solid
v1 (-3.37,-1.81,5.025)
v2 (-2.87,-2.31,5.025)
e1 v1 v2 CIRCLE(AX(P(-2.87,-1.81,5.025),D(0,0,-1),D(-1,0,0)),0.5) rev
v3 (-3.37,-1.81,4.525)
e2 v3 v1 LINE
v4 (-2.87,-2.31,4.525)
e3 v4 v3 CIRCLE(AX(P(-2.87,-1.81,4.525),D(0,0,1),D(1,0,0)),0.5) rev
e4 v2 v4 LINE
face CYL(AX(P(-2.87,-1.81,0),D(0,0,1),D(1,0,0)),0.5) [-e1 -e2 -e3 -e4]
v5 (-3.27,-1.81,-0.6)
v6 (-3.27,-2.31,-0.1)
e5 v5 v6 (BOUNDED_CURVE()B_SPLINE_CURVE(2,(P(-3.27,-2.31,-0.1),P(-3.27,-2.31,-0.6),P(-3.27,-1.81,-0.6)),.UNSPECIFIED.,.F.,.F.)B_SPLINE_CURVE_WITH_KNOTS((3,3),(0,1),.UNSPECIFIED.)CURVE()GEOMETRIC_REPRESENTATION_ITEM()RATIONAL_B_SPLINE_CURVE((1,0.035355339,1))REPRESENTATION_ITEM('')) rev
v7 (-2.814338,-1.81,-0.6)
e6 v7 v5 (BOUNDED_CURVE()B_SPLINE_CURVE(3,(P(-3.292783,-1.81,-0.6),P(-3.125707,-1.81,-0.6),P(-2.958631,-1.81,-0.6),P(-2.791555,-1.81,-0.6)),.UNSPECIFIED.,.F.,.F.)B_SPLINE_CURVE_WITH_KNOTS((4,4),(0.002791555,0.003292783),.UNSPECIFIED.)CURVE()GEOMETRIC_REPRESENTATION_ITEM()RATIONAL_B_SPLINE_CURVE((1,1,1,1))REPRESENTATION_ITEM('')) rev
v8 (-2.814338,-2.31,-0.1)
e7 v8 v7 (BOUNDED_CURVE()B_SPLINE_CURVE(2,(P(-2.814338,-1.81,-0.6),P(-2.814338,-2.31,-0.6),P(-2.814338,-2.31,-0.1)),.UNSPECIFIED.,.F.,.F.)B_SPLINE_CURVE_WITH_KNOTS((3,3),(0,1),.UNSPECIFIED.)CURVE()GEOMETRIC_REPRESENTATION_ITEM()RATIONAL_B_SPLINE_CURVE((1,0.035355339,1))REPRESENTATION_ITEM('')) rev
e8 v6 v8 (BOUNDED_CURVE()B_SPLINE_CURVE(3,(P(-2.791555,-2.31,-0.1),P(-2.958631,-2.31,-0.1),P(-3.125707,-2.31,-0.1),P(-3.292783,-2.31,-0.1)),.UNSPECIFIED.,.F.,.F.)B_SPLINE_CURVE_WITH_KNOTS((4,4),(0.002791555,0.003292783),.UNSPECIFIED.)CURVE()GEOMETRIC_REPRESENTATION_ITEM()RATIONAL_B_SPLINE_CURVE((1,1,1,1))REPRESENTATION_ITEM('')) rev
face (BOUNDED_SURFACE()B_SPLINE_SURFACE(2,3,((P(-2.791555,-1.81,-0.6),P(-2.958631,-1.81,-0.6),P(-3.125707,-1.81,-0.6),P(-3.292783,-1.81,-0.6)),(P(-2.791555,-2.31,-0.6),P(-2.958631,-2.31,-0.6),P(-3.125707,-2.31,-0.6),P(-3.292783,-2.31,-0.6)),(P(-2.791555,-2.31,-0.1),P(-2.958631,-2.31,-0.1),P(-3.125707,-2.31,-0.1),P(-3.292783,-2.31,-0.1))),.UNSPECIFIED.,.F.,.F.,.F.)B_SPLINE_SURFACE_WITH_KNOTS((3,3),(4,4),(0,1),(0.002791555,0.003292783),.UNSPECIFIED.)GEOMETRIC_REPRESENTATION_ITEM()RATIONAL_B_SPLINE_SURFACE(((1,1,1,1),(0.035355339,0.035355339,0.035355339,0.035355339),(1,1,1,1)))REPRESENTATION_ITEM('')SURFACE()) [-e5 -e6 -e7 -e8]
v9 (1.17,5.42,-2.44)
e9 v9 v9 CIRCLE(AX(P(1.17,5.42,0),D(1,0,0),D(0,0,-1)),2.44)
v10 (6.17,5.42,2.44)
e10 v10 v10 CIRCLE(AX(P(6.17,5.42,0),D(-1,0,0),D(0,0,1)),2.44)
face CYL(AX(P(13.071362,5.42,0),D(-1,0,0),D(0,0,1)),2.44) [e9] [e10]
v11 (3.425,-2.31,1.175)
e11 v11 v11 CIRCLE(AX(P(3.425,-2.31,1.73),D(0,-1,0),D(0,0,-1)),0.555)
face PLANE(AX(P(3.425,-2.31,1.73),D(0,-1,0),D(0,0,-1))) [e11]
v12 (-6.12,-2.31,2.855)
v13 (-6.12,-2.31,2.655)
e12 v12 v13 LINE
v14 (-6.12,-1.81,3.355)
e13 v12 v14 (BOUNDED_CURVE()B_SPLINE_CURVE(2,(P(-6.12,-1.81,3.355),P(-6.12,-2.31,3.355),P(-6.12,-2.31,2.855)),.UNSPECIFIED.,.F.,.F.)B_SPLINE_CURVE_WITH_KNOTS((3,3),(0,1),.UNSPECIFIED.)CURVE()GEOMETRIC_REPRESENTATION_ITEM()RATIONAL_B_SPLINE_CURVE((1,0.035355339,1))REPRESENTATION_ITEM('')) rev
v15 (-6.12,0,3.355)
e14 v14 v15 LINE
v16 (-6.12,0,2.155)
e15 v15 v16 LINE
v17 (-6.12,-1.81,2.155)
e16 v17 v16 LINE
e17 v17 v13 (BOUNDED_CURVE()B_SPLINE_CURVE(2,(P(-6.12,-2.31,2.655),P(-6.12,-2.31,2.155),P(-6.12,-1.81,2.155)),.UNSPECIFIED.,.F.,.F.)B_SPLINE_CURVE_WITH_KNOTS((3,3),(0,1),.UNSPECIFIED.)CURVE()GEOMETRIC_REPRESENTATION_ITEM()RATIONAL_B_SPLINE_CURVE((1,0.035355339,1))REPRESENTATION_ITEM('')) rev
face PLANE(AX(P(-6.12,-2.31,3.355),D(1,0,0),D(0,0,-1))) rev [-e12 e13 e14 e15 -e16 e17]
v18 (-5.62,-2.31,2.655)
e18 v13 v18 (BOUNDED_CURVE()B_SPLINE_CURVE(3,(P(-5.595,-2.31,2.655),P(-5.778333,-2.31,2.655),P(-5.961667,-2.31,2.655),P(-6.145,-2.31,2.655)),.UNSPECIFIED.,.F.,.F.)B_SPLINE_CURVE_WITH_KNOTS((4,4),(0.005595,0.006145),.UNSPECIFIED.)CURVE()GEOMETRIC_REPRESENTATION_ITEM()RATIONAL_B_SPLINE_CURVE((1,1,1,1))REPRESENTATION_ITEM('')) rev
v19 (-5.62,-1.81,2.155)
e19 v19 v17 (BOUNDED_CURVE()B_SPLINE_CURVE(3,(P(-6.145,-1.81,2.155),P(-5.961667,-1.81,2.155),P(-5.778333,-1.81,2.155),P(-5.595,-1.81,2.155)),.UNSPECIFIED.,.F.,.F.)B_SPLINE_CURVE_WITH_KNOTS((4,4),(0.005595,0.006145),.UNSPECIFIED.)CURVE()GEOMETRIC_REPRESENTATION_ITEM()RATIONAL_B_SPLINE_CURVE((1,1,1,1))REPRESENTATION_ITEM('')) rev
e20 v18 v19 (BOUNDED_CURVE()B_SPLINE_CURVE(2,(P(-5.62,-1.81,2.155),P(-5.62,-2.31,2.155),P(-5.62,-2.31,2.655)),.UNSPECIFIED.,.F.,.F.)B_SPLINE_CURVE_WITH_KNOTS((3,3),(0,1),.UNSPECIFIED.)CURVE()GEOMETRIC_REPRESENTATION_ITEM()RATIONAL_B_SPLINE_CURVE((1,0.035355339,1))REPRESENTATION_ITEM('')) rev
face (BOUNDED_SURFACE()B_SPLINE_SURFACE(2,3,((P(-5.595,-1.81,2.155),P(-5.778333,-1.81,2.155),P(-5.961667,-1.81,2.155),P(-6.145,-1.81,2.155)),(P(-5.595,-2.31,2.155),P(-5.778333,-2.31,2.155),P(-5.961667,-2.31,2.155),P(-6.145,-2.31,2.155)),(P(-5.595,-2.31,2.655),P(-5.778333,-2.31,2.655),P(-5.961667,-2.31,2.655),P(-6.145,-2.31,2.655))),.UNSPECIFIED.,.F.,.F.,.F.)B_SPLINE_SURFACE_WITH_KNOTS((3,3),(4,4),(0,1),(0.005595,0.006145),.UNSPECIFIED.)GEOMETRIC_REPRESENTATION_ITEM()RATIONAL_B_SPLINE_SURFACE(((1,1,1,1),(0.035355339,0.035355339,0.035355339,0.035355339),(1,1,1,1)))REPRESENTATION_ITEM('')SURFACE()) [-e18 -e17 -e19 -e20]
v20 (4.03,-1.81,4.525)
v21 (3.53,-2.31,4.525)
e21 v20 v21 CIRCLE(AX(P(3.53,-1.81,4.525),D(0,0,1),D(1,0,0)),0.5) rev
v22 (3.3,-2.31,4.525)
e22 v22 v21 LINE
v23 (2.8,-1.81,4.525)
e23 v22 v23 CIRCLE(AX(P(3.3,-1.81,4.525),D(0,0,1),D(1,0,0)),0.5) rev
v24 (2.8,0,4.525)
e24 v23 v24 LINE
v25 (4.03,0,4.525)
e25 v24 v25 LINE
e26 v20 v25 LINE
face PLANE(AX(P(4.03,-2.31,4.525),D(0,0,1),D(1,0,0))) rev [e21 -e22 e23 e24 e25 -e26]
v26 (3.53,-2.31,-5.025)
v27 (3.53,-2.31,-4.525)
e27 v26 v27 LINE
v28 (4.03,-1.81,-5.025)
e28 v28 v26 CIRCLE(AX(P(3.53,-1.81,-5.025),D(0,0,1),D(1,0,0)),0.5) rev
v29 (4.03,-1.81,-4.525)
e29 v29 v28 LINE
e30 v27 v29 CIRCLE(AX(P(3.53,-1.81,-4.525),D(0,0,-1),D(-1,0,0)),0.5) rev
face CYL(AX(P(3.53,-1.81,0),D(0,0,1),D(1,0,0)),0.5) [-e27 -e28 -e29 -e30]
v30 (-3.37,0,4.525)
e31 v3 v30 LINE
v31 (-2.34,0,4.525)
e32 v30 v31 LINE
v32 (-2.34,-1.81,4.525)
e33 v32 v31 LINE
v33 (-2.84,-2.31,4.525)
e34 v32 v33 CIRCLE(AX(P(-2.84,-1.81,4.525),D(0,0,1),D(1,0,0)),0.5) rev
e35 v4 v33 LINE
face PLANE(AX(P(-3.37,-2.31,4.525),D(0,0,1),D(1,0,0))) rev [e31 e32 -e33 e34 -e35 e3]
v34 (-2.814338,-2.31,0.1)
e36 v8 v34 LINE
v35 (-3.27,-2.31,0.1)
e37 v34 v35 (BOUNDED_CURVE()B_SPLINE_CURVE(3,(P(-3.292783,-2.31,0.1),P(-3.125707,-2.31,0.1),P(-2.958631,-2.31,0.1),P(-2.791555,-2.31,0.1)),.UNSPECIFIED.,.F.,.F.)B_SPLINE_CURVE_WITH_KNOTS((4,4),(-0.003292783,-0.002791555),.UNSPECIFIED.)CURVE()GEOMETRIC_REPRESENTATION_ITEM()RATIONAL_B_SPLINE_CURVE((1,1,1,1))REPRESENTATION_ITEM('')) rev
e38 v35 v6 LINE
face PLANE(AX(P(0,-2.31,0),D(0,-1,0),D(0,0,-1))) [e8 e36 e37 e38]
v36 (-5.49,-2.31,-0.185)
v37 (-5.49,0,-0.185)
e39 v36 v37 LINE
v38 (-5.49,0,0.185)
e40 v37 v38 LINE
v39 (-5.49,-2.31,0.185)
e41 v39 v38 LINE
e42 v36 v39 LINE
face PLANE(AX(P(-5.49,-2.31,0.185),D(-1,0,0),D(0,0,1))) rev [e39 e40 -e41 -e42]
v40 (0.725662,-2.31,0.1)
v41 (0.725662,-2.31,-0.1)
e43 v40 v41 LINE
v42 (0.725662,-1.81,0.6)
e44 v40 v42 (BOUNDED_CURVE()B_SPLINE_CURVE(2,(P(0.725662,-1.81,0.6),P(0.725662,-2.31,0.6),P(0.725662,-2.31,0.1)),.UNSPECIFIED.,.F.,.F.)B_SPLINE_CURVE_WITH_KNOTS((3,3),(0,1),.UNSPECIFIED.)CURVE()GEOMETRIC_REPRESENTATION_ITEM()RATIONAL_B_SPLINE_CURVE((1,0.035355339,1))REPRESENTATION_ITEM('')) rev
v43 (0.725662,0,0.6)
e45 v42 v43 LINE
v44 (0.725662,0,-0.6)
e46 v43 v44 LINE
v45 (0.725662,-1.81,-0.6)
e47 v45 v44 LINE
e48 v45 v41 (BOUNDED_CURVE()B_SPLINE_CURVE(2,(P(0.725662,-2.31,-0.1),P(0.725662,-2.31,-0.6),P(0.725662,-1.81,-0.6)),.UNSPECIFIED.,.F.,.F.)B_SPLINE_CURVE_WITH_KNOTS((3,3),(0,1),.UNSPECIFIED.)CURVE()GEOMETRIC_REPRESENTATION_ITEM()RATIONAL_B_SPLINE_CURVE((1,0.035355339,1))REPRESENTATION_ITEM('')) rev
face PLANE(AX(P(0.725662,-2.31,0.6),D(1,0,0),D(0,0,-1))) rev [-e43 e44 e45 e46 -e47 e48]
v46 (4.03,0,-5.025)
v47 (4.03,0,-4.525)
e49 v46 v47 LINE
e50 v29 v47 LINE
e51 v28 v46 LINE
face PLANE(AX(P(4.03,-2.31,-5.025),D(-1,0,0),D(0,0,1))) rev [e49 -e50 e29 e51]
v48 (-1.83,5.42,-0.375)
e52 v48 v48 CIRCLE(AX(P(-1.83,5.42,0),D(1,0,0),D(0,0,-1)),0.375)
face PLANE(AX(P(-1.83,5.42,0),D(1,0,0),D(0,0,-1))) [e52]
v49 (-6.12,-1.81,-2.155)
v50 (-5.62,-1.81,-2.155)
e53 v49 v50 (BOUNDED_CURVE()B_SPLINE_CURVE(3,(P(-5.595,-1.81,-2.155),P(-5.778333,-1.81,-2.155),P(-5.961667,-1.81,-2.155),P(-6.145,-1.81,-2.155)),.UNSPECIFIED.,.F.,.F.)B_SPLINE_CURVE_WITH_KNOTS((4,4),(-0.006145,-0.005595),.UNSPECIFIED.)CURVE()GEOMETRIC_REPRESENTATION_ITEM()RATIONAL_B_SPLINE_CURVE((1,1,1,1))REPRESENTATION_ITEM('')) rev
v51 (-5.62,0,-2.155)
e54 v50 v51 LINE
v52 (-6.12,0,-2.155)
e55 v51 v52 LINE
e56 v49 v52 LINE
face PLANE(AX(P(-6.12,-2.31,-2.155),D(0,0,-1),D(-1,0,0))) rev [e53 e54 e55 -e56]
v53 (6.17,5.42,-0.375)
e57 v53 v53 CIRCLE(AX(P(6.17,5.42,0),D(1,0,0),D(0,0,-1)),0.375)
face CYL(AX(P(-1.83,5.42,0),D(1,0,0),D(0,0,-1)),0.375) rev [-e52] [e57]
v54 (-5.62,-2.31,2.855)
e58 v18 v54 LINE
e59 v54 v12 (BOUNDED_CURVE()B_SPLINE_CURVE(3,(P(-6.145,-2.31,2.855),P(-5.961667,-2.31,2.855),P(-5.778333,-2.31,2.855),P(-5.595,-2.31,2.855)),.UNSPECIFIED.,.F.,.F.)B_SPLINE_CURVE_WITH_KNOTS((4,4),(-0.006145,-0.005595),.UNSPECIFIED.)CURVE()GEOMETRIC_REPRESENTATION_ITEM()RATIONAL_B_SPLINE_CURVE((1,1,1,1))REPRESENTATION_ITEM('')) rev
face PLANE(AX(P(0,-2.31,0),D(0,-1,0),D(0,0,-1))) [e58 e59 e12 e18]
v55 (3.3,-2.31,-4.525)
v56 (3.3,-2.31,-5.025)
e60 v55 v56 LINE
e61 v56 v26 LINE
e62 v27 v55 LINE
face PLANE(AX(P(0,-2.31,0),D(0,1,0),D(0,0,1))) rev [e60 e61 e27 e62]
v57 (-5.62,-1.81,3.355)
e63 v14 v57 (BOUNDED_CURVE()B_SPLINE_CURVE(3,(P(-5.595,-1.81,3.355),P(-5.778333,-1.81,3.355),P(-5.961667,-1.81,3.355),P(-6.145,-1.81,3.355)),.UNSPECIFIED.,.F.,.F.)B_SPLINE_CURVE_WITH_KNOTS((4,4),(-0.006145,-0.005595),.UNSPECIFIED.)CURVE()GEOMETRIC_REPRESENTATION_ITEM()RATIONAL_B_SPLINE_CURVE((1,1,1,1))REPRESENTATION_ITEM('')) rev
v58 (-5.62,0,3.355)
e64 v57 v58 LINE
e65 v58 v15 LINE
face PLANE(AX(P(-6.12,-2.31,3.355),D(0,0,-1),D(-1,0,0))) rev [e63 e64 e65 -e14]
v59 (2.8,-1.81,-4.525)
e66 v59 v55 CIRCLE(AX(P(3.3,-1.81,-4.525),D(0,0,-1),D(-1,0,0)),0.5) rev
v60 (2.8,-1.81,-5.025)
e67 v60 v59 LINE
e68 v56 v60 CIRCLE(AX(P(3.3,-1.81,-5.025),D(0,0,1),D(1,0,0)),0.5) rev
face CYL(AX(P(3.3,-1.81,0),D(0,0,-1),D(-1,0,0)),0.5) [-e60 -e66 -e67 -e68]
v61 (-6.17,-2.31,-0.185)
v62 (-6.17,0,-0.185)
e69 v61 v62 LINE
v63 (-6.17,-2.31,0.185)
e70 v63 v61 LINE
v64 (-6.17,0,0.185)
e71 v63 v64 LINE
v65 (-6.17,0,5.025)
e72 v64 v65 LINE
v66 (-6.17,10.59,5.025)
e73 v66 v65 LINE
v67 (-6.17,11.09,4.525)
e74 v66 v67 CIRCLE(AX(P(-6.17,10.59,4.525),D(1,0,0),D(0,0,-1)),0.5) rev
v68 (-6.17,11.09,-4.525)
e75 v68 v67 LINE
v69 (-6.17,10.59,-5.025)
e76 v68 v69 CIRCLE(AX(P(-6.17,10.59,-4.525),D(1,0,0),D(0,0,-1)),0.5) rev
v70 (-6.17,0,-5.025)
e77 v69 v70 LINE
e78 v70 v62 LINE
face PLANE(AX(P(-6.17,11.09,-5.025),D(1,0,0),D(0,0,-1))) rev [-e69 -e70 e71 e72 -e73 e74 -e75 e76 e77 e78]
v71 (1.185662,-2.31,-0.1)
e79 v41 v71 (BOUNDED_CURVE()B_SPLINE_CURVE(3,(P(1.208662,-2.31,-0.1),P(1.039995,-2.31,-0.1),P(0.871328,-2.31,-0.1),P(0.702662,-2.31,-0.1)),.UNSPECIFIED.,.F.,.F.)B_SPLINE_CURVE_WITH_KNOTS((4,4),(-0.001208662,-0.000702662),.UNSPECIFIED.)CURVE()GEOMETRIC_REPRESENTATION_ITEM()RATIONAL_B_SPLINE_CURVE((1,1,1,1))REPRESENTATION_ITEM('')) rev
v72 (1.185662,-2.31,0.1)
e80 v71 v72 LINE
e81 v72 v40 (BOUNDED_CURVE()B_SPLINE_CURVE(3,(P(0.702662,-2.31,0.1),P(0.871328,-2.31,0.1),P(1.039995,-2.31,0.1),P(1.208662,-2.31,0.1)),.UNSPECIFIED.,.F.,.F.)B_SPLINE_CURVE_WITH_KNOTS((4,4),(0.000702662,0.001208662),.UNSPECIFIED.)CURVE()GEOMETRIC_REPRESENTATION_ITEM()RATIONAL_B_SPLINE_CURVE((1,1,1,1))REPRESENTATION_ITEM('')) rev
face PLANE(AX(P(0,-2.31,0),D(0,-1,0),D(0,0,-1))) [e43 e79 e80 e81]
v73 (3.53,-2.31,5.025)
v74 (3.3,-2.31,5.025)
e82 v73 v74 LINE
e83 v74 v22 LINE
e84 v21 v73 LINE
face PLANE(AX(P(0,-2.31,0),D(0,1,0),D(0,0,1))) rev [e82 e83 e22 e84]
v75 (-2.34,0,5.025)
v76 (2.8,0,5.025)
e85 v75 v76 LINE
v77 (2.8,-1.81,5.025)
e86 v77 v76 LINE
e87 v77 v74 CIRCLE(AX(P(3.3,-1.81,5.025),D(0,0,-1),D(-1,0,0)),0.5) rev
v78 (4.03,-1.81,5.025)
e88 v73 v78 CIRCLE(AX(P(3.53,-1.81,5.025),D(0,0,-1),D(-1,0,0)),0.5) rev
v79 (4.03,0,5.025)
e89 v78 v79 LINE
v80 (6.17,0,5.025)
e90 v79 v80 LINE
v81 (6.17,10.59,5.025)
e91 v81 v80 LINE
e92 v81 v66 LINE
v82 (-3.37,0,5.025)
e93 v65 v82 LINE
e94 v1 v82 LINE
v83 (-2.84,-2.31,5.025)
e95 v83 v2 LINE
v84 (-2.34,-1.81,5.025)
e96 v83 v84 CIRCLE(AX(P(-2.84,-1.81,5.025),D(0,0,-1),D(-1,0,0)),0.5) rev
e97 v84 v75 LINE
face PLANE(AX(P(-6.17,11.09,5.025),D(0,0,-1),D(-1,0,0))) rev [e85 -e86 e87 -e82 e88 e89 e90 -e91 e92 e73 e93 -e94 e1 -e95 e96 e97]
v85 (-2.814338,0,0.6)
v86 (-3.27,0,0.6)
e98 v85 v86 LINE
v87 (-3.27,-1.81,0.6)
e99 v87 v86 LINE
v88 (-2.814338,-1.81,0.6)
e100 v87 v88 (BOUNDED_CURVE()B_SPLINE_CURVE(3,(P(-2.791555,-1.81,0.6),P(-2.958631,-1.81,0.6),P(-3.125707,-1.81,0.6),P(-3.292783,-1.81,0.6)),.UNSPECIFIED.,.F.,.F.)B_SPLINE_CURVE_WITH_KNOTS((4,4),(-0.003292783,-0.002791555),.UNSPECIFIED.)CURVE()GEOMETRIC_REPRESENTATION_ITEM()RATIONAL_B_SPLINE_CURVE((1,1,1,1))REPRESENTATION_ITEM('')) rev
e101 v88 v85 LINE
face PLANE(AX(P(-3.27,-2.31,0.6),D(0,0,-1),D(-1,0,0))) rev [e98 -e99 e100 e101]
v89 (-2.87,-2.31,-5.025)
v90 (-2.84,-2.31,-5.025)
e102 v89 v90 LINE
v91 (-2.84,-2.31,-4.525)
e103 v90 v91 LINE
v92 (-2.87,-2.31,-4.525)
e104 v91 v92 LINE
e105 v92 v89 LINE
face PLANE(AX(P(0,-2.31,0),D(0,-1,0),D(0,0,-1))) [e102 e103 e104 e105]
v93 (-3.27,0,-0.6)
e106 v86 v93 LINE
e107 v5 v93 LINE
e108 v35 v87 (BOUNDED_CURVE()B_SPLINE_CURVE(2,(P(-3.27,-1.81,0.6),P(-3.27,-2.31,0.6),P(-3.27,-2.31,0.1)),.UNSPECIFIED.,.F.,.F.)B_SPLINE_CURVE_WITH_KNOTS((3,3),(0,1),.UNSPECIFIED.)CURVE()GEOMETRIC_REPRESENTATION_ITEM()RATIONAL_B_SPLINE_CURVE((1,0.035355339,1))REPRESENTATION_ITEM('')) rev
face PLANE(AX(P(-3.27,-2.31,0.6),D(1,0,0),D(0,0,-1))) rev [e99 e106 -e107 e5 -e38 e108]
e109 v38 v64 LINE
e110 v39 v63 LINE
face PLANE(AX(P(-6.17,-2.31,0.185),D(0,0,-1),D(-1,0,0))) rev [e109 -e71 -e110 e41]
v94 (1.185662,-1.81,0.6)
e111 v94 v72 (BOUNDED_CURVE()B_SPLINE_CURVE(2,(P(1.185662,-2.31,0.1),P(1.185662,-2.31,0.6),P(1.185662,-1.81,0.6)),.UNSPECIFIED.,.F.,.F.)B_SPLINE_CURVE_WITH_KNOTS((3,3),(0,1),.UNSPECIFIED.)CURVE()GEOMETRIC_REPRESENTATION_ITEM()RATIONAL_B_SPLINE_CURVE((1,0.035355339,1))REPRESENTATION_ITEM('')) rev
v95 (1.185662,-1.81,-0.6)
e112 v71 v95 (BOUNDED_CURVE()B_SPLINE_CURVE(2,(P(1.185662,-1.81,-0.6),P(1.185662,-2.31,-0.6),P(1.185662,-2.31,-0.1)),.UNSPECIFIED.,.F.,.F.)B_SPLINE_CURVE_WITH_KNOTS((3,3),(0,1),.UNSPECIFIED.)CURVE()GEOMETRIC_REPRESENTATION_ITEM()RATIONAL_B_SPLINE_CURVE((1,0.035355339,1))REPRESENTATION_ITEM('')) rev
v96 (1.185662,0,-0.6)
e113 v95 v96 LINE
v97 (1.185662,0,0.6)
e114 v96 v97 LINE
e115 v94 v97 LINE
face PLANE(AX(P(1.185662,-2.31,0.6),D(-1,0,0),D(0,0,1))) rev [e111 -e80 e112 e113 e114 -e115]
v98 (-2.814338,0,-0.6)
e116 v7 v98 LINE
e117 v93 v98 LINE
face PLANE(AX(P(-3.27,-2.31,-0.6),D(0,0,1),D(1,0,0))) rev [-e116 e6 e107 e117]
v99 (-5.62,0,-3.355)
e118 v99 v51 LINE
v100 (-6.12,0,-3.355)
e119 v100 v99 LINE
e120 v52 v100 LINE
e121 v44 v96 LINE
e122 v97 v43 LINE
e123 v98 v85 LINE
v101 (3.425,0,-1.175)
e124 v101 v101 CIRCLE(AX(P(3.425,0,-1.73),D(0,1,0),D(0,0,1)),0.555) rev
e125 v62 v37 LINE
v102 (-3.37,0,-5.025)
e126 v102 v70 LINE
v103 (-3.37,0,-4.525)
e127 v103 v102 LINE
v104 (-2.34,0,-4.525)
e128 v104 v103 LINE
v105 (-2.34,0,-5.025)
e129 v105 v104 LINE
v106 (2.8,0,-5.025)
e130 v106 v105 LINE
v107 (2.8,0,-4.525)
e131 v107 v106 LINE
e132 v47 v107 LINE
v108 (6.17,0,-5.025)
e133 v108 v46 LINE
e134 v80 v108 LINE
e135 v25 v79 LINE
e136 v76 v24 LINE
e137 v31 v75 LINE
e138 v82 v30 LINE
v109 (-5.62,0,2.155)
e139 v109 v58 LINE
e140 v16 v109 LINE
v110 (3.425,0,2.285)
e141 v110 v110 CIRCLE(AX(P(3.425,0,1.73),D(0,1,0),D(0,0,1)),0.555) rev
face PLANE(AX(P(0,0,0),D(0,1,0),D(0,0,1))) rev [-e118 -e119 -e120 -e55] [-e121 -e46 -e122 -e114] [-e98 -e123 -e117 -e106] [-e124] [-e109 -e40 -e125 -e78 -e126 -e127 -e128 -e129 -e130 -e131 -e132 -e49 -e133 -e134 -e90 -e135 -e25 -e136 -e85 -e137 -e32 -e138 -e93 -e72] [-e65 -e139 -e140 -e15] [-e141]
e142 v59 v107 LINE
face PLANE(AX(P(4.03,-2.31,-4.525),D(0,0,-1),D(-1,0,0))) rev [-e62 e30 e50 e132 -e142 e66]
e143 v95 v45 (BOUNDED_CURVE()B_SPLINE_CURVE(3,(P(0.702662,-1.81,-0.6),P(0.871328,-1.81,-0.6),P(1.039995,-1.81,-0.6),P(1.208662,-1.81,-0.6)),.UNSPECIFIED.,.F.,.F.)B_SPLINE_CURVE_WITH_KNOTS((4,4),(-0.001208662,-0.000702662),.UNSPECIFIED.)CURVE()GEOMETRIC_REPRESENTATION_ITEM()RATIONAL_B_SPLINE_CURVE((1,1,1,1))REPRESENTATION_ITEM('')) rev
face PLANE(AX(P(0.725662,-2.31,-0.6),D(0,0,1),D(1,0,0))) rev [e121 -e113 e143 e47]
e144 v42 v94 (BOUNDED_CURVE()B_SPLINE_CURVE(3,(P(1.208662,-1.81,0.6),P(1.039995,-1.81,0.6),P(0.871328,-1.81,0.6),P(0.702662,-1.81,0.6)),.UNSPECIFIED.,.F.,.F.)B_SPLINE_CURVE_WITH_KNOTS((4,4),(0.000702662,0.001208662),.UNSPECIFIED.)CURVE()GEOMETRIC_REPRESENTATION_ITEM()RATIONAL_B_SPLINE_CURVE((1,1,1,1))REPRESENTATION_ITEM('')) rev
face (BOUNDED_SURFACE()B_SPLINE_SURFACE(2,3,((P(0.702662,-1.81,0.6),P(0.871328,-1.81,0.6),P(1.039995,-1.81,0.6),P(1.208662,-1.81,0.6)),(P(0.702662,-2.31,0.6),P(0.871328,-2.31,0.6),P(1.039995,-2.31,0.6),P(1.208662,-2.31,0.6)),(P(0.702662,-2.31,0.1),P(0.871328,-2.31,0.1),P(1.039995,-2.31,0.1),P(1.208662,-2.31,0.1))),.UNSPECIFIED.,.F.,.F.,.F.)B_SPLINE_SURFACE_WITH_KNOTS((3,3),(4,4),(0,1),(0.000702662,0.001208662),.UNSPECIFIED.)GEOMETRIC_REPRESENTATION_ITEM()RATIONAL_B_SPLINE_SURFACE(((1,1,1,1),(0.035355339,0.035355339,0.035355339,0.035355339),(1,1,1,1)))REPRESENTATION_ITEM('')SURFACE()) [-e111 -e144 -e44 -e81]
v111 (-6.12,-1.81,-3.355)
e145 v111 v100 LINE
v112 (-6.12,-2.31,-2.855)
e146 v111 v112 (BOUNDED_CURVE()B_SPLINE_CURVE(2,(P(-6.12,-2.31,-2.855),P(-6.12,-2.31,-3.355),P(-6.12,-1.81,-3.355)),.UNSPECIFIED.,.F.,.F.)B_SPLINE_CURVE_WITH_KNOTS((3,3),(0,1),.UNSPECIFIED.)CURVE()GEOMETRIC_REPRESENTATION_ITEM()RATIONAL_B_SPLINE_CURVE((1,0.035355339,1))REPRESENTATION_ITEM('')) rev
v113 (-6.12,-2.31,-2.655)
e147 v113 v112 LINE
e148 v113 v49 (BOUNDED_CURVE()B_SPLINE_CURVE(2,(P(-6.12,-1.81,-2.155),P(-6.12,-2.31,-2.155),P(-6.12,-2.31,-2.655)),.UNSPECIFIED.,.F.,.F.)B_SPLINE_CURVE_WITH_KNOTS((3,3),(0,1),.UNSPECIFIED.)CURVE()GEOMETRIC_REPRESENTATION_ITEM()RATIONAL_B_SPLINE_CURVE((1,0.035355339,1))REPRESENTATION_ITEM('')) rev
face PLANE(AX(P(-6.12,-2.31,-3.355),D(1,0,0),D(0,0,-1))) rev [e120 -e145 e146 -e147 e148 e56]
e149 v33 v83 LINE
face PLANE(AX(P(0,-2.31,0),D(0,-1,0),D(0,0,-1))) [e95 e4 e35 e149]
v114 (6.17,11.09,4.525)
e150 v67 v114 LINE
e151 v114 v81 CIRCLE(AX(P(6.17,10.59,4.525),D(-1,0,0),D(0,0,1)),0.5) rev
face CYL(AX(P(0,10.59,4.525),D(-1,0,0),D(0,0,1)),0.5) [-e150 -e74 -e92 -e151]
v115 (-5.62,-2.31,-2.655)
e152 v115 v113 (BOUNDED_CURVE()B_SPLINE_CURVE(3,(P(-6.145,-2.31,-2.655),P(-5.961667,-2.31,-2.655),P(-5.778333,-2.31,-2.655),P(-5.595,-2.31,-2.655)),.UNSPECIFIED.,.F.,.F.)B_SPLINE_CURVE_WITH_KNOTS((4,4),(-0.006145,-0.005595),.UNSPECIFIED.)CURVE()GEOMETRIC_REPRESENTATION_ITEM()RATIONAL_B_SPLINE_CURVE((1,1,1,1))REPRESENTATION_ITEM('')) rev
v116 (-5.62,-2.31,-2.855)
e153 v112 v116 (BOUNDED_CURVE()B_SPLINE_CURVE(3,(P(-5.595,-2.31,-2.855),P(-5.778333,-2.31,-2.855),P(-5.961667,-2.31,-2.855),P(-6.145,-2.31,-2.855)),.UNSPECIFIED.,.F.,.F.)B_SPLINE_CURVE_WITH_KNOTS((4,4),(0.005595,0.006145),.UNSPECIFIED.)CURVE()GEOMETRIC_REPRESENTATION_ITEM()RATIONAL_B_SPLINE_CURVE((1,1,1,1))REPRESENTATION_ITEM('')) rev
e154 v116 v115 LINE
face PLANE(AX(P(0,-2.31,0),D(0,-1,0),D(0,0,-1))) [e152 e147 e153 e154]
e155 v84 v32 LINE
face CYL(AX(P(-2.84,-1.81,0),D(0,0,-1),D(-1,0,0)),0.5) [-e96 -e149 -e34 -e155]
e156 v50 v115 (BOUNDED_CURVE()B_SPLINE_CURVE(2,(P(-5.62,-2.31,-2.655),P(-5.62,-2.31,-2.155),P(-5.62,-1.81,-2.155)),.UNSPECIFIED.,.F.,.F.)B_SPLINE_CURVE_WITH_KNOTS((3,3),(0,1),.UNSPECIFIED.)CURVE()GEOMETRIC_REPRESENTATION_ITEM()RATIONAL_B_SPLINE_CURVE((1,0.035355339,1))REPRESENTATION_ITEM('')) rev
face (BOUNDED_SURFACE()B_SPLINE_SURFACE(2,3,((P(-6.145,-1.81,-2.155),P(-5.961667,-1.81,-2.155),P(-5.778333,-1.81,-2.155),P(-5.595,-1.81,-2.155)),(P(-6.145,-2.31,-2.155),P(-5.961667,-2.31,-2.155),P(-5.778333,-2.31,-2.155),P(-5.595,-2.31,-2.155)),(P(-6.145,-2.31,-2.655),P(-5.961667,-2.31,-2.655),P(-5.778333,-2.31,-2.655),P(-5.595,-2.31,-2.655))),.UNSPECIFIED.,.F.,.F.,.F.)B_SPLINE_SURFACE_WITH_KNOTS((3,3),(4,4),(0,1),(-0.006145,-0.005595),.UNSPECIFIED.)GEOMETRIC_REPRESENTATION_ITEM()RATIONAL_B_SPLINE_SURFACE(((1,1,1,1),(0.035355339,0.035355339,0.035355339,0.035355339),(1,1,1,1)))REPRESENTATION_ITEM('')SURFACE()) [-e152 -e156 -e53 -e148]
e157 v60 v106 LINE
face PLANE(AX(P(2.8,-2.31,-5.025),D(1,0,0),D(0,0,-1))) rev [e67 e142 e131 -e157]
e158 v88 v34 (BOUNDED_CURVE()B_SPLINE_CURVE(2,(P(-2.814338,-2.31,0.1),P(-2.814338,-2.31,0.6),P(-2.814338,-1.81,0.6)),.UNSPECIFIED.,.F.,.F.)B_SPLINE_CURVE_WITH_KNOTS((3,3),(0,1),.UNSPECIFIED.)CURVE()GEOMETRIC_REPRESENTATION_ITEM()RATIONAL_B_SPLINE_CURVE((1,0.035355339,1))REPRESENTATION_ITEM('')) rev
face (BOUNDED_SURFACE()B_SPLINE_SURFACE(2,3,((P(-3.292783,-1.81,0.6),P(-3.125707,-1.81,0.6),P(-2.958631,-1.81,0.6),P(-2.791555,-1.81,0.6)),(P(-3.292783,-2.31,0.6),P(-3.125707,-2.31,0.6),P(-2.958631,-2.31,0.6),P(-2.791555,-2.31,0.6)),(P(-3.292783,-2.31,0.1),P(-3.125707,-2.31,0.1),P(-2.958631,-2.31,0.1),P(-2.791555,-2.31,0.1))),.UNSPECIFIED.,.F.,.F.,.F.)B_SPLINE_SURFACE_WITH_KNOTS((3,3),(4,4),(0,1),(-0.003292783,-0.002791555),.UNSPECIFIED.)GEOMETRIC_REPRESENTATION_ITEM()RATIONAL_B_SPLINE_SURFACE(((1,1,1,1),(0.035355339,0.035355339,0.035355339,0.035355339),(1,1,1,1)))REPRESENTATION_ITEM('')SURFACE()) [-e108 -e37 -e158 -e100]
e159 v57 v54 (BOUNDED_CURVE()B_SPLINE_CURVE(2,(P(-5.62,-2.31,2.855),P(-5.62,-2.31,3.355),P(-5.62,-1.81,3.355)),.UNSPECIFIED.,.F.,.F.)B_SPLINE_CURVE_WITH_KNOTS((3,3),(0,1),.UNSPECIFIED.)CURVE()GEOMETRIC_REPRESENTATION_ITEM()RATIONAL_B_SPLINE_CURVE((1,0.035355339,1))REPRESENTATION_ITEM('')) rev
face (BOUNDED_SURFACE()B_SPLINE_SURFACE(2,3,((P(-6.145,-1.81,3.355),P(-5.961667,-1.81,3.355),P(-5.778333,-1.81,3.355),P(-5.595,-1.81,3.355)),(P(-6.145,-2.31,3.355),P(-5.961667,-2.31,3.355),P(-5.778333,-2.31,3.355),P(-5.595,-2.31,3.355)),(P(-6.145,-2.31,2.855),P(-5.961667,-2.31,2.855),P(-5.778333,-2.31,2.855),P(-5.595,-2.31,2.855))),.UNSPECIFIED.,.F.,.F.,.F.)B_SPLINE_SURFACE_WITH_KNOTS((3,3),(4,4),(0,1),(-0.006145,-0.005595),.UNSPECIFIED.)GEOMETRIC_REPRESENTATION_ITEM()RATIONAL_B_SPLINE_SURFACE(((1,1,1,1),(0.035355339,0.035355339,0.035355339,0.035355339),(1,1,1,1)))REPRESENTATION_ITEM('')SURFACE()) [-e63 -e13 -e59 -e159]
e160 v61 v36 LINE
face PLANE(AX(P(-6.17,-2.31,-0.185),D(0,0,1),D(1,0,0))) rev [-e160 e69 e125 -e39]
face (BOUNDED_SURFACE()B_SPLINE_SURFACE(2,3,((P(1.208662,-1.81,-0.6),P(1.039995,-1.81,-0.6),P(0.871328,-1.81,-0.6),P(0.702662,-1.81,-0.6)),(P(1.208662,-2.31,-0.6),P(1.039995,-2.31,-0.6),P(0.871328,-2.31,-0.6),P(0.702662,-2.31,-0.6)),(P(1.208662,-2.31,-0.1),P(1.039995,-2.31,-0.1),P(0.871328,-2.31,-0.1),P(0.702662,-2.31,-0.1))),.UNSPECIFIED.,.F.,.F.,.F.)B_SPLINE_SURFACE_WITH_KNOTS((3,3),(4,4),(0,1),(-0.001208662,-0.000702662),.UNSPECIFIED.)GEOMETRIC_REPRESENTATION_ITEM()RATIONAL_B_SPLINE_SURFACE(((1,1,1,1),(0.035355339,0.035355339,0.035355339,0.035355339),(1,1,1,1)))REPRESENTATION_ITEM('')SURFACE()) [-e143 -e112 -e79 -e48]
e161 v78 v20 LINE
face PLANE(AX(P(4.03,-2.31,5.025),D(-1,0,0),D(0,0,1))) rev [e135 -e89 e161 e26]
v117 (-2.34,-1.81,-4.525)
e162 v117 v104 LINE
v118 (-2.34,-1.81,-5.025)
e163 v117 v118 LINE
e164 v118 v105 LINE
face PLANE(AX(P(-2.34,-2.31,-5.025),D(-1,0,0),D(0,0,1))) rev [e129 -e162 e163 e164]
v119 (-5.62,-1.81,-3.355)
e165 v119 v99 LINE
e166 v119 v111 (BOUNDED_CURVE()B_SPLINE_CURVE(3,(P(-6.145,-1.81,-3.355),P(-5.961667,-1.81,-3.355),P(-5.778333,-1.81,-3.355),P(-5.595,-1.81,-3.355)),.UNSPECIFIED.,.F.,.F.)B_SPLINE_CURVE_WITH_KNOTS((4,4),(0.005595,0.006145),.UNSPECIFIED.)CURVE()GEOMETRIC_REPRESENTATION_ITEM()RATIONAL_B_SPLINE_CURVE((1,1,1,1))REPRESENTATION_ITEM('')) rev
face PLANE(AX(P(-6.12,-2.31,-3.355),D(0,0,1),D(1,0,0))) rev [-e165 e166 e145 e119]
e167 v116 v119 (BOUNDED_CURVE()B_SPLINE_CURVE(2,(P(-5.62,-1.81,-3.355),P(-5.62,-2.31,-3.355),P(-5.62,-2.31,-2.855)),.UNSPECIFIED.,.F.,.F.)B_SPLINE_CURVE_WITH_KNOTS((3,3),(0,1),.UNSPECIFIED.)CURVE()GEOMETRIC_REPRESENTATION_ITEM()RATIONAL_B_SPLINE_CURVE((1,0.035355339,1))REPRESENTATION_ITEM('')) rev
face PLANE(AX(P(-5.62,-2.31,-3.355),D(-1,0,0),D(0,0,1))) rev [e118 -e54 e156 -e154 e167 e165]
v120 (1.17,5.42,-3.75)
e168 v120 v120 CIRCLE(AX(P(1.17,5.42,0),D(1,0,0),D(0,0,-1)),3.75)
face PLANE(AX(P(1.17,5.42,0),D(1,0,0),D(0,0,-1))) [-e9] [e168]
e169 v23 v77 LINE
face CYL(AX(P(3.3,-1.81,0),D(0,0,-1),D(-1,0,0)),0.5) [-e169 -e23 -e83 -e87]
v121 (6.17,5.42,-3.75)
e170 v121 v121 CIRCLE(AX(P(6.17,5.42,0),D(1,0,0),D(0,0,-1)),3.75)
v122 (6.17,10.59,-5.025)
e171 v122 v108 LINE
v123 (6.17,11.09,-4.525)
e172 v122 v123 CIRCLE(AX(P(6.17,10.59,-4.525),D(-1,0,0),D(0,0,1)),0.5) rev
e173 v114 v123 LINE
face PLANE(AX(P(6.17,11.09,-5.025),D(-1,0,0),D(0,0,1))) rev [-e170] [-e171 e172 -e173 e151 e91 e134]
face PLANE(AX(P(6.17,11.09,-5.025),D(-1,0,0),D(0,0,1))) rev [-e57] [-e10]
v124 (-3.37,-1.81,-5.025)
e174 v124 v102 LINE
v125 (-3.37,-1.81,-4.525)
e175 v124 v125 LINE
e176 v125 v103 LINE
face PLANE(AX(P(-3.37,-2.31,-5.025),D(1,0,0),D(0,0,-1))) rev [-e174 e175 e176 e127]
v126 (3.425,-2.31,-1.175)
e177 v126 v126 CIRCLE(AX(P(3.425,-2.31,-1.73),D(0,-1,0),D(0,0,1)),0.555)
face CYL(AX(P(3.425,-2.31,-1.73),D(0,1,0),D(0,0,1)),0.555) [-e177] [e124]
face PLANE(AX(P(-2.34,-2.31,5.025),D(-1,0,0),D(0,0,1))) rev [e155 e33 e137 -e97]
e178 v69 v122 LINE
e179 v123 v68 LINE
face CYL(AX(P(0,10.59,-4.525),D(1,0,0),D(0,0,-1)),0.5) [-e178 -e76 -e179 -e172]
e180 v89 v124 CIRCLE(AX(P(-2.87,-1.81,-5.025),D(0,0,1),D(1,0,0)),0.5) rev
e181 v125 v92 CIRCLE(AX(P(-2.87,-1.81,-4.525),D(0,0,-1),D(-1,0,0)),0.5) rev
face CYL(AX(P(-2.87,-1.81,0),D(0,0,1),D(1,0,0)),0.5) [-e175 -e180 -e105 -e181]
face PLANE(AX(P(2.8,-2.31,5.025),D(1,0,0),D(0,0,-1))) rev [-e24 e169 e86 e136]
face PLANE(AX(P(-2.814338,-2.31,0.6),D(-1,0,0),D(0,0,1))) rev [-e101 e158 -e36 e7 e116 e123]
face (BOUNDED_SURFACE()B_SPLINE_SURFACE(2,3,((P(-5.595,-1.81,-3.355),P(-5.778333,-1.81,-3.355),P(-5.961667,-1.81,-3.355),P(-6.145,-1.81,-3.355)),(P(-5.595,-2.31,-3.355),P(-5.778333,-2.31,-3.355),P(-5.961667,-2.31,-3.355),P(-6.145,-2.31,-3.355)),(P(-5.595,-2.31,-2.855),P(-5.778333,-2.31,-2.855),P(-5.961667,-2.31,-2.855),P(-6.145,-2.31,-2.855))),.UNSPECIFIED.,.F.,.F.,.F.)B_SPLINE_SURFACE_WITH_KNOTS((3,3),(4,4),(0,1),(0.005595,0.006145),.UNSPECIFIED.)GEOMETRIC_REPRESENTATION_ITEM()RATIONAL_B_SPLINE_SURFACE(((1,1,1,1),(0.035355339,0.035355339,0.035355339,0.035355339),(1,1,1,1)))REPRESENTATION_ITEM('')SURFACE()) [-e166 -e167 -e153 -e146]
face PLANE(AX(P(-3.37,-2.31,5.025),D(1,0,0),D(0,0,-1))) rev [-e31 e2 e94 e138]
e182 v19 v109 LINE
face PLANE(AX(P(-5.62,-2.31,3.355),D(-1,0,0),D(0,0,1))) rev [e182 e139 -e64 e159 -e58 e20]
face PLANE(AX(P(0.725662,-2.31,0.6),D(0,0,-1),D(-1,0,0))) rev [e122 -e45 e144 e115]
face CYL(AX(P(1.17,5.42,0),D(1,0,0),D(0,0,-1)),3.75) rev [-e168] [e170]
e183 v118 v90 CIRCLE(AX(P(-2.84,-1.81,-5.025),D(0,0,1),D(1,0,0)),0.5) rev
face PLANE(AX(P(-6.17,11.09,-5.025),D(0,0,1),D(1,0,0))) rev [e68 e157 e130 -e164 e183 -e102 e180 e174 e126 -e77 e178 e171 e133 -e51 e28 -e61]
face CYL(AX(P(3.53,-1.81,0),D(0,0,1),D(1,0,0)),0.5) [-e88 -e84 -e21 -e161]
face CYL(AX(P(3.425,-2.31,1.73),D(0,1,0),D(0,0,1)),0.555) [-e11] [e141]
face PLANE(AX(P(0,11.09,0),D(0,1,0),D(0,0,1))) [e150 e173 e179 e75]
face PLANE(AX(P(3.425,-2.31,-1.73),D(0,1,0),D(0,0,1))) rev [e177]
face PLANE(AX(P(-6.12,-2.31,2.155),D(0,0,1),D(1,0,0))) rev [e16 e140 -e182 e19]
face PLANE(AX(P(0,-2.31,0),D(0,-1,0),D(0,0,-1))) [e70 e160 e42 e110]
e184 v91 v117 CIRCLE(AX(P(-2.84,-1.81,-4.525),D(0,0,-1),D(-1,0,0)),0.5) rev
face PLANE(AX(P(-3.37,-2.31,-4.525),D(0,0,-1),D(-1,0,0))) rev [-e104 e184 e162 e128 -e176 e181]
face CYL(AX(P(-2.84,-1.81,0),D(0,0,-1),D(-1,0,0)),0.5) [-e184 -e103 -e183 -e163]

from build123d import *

# Parameters (mm, degrees)
SKETCH1_W           = 12.34
SKETCH1_H           = 10.05
BOSS_EXTRUDE1_DEPTH = 11.09
SKETCH2_R           = 3.75
CUT_EXTRUDE1_DEPTH  = 5
SKETCH4_R           = 2.44
BOSS_EXTRUDE2_DEPTH = 5
SKETCH6_R           = 0.375
CUT_EXTRUDE2_DEPTH  = 8
SKETCH13_R          = 0.555
SKETCH13_W          = 1.23
SKETCH13_H          = 0.5
SKETCH13_W_2        = 0.5
SKETCH13_H_2        = 1.2
SKETCH13_W_3        = 1.03
SKETCH13_W_4        = 0.455661697
SKETCH13_W_5        = 0.46
SKETCH13_W_6        = 0.68
SKETCH13_H_3        = 0.37
BOSS_EXTRUDE3_DEPTH = 2.31
FILLET2_R           = 0.5
FILLET3_R           = 0.5
FILLET4_SIZE        = 0.5


with BuildPart() as part:
    # Sketch1 → Boss-Extrude1 (new body)
    with BuildSketch(Plane(origin=(0, 0, 0), x_dir=(1, 0, 0), z_dir=(0, 1, 0))):
        Rectangle(SKETCH1_W, SKETCH1_H)
    extrude(amount=BOSS_EXTRUDE1_DEPTH)

    # Sketch2 → Cut-Extrude1 (cut)
    with BuildSketch(Plane(origin=(6.17, 0, 0), x_dir=(0, 0, -1), z_dir=(1, 0, 0))):
        with Locations((0, 5.42)):
            Circle(SKETCH2_R)
    extrude(amount=-CUT_EXTRUDE1_DEPTH, mode=Mode.SUBTRACT)

    # Sketch4 → Boss-Extrude2 (add)
    with BuildSketch(Plane(origin=(1.17, 0, 0), x_dir=(0, 0, -1), z_dir=(1, 0, 0))):
        with Locations(Location((0, 5.42, 0), (0, 0, 180))):
            Circle(SKETCH4_R)
    extrude(amount=BOSS_EXTRUDE2_DEPTH)

    # Sketch6 → Cut-Extrude2 (cut)
    with BuildSketch(Plane(origin=(6.17, 0, 0), x_dir=(0, 0, -1), z_dir=(1, 0, 0))):
        with Locations((0, 5.42)):
            Circle(SKETCH6_R)
    extrude(amount=-CUT_EXTRUDE2_DEPTH, mode=Mode.SUBTRACT)

    # Sketch13 → Boss-Extrude3 (add)
    with BuildSketch(Plane.XZ):
        with Locations(Location((3.425, 1.73, 0), (0, 0, 90))):
            Circle(SKETCH13_R)
        with Locations(Location((3.425, -1.73, 0), (0, 0, 90))):
            Circle(SKETCH13_R)
        with Locations((3.415, 4.775)):
            Rectangle(SKETCH13_W, SKETCH13_H)
        with Locations((-5.87, -2.755)):
            Rectangle(SKETCH13_W_2, SKETCH13_H_2)
        with Locations((-2.855, 4.775)):
            Rectangle(SKETCH13_W_3, SKETCH13_H)
        with Locations((-5.87, 2.755)):
            Rectangle(SKETCH13_W_2, SKETCH13_H_2)
        with Locations((-3.042169152, 0)):
            Rectangle(SKETCH13_W_4, SKETCH13_H_2)
        with Locations((0.955661697, 0)):
            Rectangle(SKETCH13_W_5, SKETCH13_H_2)
        with Locations((-2.855, -4.775)):
            Rectangle(SKETCH13_W_3, SKETCH13_H)
        with Locations((3.415, -4.775)):
            Rectangle(SKETCH13_W, SKETCH13_H)
        with Locations((-5.83, 0)):
            Rectangle(SKETCH13_W_6, SKETCH13_H_3)
    extrude(amount=BOSS_EXTRUDE3_DEPTH)

    # Fillet2
    fillet2_edges = [part.edges().sort_by_distance(p)[0] for p in [
        (-2.34, -2.31, -4.775),
        (-3.37, -2.31, -4.775),
        (4.03, -2.31, -4.775),
        (2.8, -2.31, -4.775),
        (4.03, -2.31, 4.775),
        (2.8, -2.31, 4.775),
        (-3.37, -2.31, 4.775),
        (-2.34, -2.31, 4.775),
    ]]
    fillet(fillet2_edges, radius=FILLET2_R)

    # Fillet3
    fillet3_edges = [part.edges().sort_by_distance(p)[0] for p in [
        (0, 11.09, 5.025),
        (0, 11.09, -5.025),
    ]]
    fillet(fillet3_edges, radius=FILLET3_R)

    # Fillet4
    # a fillet whose section is not a circle: 0.5 mm, written as the material it takes off along each edge
    with BuildSketch(Plane(origin=(2.435661697, -2.31, -0.6), x_dir=(0, 1, 0), z_dir=(-1, 0, 0)), Plane(origin=(-0.524338303, -2.31, 0.6), x_dir=(0, 1, 0), z_dir=(1, 0, 0))) as fillet4_piece_1:
        with BuildLine():
            Bezier((FILLET4_SIZE, 0), (0, 0), (0, -FILLET4_SIZE), weights=[1, 0.035355339, 1])
            Line((0, -FILLET4_SIZE), (0, 0))
            Line((0, 0), (FILLET4_SIZE, 0))
        make_face()
    extrude(amount=2.96, mode=Mode.SUBTRACT)
    with BuildSketch(Plane(origin=(-1.564338303, -2.31, -0.6), x_dir=(0, 1, 0), z_dir=(-1, 0, 0)), Plane(origin=(-4.52, -2.31, 0.6), x_dir=(0, 1, 0), z_dir=(1, 0, 0))) as fillet4_piece_2:
        with BuildLine():
            Bezier((FILLET4_SIZE, 0), (0, 0), (0, -FILLET4_SIZE), weights=[1, 0.035355339, 1])
            Line((0, -FILLET4_SIZE), (0, 0))
            Line((0, 0), (FILLET4_SIZE, 0))
        make_face()
    extrude(amount=2.955661697, mode=Mode.SUBTRACT)
    with BuildSketch(Plane(origin=(-7.37, -2.31, -3.355), x_dir=(0, 1, 0), z_dir=(1, 0, 0)), Plane(origin=(-4.37, -2.31, -2.155), x_dir=(0, 1, 0), z_dir=(-1, 0, 0))) as fillet4_piece_3:
        with BuildLine():
            Bezier((FILLET4_SIZE, 0), (0, 0), (0, FILLET4_SIZE), weights=[1, 0.035355339, 1])
            Line((0, FILLET4_SIZE), (0, 0))
            Line((0, 0), (FILLET4_SIZE, 0))
        make_face()
    extrude(amount=3, mode=Mode.SUBTRACT)
    with BuildSketch(Plane(origin=(-4.37, -2.31, 2.155), x_dir=(0, 1, 0), z_dir=(-1, 0, 0)), Plane(origin=(-7.37, -2.31, 3.355), x_dir=(0, 1, 0), z_dir=(1, 0, 0))) as fillet4_piece_4:
        with BuildLine():
            Bezier((FILLET4_SIZE, 0), (0, 0), (0, -FILLET4_SIZE), weights=[1, 0.035355339, 1])
            Line((0, -FILLET4_SIZE), (0, 0))
            Line((0, 0), (FILLET4_SIZE, 0))
        make_face()
    extrude(amount=3, mode=Mode.SUBTRACT)


solid = part.part
